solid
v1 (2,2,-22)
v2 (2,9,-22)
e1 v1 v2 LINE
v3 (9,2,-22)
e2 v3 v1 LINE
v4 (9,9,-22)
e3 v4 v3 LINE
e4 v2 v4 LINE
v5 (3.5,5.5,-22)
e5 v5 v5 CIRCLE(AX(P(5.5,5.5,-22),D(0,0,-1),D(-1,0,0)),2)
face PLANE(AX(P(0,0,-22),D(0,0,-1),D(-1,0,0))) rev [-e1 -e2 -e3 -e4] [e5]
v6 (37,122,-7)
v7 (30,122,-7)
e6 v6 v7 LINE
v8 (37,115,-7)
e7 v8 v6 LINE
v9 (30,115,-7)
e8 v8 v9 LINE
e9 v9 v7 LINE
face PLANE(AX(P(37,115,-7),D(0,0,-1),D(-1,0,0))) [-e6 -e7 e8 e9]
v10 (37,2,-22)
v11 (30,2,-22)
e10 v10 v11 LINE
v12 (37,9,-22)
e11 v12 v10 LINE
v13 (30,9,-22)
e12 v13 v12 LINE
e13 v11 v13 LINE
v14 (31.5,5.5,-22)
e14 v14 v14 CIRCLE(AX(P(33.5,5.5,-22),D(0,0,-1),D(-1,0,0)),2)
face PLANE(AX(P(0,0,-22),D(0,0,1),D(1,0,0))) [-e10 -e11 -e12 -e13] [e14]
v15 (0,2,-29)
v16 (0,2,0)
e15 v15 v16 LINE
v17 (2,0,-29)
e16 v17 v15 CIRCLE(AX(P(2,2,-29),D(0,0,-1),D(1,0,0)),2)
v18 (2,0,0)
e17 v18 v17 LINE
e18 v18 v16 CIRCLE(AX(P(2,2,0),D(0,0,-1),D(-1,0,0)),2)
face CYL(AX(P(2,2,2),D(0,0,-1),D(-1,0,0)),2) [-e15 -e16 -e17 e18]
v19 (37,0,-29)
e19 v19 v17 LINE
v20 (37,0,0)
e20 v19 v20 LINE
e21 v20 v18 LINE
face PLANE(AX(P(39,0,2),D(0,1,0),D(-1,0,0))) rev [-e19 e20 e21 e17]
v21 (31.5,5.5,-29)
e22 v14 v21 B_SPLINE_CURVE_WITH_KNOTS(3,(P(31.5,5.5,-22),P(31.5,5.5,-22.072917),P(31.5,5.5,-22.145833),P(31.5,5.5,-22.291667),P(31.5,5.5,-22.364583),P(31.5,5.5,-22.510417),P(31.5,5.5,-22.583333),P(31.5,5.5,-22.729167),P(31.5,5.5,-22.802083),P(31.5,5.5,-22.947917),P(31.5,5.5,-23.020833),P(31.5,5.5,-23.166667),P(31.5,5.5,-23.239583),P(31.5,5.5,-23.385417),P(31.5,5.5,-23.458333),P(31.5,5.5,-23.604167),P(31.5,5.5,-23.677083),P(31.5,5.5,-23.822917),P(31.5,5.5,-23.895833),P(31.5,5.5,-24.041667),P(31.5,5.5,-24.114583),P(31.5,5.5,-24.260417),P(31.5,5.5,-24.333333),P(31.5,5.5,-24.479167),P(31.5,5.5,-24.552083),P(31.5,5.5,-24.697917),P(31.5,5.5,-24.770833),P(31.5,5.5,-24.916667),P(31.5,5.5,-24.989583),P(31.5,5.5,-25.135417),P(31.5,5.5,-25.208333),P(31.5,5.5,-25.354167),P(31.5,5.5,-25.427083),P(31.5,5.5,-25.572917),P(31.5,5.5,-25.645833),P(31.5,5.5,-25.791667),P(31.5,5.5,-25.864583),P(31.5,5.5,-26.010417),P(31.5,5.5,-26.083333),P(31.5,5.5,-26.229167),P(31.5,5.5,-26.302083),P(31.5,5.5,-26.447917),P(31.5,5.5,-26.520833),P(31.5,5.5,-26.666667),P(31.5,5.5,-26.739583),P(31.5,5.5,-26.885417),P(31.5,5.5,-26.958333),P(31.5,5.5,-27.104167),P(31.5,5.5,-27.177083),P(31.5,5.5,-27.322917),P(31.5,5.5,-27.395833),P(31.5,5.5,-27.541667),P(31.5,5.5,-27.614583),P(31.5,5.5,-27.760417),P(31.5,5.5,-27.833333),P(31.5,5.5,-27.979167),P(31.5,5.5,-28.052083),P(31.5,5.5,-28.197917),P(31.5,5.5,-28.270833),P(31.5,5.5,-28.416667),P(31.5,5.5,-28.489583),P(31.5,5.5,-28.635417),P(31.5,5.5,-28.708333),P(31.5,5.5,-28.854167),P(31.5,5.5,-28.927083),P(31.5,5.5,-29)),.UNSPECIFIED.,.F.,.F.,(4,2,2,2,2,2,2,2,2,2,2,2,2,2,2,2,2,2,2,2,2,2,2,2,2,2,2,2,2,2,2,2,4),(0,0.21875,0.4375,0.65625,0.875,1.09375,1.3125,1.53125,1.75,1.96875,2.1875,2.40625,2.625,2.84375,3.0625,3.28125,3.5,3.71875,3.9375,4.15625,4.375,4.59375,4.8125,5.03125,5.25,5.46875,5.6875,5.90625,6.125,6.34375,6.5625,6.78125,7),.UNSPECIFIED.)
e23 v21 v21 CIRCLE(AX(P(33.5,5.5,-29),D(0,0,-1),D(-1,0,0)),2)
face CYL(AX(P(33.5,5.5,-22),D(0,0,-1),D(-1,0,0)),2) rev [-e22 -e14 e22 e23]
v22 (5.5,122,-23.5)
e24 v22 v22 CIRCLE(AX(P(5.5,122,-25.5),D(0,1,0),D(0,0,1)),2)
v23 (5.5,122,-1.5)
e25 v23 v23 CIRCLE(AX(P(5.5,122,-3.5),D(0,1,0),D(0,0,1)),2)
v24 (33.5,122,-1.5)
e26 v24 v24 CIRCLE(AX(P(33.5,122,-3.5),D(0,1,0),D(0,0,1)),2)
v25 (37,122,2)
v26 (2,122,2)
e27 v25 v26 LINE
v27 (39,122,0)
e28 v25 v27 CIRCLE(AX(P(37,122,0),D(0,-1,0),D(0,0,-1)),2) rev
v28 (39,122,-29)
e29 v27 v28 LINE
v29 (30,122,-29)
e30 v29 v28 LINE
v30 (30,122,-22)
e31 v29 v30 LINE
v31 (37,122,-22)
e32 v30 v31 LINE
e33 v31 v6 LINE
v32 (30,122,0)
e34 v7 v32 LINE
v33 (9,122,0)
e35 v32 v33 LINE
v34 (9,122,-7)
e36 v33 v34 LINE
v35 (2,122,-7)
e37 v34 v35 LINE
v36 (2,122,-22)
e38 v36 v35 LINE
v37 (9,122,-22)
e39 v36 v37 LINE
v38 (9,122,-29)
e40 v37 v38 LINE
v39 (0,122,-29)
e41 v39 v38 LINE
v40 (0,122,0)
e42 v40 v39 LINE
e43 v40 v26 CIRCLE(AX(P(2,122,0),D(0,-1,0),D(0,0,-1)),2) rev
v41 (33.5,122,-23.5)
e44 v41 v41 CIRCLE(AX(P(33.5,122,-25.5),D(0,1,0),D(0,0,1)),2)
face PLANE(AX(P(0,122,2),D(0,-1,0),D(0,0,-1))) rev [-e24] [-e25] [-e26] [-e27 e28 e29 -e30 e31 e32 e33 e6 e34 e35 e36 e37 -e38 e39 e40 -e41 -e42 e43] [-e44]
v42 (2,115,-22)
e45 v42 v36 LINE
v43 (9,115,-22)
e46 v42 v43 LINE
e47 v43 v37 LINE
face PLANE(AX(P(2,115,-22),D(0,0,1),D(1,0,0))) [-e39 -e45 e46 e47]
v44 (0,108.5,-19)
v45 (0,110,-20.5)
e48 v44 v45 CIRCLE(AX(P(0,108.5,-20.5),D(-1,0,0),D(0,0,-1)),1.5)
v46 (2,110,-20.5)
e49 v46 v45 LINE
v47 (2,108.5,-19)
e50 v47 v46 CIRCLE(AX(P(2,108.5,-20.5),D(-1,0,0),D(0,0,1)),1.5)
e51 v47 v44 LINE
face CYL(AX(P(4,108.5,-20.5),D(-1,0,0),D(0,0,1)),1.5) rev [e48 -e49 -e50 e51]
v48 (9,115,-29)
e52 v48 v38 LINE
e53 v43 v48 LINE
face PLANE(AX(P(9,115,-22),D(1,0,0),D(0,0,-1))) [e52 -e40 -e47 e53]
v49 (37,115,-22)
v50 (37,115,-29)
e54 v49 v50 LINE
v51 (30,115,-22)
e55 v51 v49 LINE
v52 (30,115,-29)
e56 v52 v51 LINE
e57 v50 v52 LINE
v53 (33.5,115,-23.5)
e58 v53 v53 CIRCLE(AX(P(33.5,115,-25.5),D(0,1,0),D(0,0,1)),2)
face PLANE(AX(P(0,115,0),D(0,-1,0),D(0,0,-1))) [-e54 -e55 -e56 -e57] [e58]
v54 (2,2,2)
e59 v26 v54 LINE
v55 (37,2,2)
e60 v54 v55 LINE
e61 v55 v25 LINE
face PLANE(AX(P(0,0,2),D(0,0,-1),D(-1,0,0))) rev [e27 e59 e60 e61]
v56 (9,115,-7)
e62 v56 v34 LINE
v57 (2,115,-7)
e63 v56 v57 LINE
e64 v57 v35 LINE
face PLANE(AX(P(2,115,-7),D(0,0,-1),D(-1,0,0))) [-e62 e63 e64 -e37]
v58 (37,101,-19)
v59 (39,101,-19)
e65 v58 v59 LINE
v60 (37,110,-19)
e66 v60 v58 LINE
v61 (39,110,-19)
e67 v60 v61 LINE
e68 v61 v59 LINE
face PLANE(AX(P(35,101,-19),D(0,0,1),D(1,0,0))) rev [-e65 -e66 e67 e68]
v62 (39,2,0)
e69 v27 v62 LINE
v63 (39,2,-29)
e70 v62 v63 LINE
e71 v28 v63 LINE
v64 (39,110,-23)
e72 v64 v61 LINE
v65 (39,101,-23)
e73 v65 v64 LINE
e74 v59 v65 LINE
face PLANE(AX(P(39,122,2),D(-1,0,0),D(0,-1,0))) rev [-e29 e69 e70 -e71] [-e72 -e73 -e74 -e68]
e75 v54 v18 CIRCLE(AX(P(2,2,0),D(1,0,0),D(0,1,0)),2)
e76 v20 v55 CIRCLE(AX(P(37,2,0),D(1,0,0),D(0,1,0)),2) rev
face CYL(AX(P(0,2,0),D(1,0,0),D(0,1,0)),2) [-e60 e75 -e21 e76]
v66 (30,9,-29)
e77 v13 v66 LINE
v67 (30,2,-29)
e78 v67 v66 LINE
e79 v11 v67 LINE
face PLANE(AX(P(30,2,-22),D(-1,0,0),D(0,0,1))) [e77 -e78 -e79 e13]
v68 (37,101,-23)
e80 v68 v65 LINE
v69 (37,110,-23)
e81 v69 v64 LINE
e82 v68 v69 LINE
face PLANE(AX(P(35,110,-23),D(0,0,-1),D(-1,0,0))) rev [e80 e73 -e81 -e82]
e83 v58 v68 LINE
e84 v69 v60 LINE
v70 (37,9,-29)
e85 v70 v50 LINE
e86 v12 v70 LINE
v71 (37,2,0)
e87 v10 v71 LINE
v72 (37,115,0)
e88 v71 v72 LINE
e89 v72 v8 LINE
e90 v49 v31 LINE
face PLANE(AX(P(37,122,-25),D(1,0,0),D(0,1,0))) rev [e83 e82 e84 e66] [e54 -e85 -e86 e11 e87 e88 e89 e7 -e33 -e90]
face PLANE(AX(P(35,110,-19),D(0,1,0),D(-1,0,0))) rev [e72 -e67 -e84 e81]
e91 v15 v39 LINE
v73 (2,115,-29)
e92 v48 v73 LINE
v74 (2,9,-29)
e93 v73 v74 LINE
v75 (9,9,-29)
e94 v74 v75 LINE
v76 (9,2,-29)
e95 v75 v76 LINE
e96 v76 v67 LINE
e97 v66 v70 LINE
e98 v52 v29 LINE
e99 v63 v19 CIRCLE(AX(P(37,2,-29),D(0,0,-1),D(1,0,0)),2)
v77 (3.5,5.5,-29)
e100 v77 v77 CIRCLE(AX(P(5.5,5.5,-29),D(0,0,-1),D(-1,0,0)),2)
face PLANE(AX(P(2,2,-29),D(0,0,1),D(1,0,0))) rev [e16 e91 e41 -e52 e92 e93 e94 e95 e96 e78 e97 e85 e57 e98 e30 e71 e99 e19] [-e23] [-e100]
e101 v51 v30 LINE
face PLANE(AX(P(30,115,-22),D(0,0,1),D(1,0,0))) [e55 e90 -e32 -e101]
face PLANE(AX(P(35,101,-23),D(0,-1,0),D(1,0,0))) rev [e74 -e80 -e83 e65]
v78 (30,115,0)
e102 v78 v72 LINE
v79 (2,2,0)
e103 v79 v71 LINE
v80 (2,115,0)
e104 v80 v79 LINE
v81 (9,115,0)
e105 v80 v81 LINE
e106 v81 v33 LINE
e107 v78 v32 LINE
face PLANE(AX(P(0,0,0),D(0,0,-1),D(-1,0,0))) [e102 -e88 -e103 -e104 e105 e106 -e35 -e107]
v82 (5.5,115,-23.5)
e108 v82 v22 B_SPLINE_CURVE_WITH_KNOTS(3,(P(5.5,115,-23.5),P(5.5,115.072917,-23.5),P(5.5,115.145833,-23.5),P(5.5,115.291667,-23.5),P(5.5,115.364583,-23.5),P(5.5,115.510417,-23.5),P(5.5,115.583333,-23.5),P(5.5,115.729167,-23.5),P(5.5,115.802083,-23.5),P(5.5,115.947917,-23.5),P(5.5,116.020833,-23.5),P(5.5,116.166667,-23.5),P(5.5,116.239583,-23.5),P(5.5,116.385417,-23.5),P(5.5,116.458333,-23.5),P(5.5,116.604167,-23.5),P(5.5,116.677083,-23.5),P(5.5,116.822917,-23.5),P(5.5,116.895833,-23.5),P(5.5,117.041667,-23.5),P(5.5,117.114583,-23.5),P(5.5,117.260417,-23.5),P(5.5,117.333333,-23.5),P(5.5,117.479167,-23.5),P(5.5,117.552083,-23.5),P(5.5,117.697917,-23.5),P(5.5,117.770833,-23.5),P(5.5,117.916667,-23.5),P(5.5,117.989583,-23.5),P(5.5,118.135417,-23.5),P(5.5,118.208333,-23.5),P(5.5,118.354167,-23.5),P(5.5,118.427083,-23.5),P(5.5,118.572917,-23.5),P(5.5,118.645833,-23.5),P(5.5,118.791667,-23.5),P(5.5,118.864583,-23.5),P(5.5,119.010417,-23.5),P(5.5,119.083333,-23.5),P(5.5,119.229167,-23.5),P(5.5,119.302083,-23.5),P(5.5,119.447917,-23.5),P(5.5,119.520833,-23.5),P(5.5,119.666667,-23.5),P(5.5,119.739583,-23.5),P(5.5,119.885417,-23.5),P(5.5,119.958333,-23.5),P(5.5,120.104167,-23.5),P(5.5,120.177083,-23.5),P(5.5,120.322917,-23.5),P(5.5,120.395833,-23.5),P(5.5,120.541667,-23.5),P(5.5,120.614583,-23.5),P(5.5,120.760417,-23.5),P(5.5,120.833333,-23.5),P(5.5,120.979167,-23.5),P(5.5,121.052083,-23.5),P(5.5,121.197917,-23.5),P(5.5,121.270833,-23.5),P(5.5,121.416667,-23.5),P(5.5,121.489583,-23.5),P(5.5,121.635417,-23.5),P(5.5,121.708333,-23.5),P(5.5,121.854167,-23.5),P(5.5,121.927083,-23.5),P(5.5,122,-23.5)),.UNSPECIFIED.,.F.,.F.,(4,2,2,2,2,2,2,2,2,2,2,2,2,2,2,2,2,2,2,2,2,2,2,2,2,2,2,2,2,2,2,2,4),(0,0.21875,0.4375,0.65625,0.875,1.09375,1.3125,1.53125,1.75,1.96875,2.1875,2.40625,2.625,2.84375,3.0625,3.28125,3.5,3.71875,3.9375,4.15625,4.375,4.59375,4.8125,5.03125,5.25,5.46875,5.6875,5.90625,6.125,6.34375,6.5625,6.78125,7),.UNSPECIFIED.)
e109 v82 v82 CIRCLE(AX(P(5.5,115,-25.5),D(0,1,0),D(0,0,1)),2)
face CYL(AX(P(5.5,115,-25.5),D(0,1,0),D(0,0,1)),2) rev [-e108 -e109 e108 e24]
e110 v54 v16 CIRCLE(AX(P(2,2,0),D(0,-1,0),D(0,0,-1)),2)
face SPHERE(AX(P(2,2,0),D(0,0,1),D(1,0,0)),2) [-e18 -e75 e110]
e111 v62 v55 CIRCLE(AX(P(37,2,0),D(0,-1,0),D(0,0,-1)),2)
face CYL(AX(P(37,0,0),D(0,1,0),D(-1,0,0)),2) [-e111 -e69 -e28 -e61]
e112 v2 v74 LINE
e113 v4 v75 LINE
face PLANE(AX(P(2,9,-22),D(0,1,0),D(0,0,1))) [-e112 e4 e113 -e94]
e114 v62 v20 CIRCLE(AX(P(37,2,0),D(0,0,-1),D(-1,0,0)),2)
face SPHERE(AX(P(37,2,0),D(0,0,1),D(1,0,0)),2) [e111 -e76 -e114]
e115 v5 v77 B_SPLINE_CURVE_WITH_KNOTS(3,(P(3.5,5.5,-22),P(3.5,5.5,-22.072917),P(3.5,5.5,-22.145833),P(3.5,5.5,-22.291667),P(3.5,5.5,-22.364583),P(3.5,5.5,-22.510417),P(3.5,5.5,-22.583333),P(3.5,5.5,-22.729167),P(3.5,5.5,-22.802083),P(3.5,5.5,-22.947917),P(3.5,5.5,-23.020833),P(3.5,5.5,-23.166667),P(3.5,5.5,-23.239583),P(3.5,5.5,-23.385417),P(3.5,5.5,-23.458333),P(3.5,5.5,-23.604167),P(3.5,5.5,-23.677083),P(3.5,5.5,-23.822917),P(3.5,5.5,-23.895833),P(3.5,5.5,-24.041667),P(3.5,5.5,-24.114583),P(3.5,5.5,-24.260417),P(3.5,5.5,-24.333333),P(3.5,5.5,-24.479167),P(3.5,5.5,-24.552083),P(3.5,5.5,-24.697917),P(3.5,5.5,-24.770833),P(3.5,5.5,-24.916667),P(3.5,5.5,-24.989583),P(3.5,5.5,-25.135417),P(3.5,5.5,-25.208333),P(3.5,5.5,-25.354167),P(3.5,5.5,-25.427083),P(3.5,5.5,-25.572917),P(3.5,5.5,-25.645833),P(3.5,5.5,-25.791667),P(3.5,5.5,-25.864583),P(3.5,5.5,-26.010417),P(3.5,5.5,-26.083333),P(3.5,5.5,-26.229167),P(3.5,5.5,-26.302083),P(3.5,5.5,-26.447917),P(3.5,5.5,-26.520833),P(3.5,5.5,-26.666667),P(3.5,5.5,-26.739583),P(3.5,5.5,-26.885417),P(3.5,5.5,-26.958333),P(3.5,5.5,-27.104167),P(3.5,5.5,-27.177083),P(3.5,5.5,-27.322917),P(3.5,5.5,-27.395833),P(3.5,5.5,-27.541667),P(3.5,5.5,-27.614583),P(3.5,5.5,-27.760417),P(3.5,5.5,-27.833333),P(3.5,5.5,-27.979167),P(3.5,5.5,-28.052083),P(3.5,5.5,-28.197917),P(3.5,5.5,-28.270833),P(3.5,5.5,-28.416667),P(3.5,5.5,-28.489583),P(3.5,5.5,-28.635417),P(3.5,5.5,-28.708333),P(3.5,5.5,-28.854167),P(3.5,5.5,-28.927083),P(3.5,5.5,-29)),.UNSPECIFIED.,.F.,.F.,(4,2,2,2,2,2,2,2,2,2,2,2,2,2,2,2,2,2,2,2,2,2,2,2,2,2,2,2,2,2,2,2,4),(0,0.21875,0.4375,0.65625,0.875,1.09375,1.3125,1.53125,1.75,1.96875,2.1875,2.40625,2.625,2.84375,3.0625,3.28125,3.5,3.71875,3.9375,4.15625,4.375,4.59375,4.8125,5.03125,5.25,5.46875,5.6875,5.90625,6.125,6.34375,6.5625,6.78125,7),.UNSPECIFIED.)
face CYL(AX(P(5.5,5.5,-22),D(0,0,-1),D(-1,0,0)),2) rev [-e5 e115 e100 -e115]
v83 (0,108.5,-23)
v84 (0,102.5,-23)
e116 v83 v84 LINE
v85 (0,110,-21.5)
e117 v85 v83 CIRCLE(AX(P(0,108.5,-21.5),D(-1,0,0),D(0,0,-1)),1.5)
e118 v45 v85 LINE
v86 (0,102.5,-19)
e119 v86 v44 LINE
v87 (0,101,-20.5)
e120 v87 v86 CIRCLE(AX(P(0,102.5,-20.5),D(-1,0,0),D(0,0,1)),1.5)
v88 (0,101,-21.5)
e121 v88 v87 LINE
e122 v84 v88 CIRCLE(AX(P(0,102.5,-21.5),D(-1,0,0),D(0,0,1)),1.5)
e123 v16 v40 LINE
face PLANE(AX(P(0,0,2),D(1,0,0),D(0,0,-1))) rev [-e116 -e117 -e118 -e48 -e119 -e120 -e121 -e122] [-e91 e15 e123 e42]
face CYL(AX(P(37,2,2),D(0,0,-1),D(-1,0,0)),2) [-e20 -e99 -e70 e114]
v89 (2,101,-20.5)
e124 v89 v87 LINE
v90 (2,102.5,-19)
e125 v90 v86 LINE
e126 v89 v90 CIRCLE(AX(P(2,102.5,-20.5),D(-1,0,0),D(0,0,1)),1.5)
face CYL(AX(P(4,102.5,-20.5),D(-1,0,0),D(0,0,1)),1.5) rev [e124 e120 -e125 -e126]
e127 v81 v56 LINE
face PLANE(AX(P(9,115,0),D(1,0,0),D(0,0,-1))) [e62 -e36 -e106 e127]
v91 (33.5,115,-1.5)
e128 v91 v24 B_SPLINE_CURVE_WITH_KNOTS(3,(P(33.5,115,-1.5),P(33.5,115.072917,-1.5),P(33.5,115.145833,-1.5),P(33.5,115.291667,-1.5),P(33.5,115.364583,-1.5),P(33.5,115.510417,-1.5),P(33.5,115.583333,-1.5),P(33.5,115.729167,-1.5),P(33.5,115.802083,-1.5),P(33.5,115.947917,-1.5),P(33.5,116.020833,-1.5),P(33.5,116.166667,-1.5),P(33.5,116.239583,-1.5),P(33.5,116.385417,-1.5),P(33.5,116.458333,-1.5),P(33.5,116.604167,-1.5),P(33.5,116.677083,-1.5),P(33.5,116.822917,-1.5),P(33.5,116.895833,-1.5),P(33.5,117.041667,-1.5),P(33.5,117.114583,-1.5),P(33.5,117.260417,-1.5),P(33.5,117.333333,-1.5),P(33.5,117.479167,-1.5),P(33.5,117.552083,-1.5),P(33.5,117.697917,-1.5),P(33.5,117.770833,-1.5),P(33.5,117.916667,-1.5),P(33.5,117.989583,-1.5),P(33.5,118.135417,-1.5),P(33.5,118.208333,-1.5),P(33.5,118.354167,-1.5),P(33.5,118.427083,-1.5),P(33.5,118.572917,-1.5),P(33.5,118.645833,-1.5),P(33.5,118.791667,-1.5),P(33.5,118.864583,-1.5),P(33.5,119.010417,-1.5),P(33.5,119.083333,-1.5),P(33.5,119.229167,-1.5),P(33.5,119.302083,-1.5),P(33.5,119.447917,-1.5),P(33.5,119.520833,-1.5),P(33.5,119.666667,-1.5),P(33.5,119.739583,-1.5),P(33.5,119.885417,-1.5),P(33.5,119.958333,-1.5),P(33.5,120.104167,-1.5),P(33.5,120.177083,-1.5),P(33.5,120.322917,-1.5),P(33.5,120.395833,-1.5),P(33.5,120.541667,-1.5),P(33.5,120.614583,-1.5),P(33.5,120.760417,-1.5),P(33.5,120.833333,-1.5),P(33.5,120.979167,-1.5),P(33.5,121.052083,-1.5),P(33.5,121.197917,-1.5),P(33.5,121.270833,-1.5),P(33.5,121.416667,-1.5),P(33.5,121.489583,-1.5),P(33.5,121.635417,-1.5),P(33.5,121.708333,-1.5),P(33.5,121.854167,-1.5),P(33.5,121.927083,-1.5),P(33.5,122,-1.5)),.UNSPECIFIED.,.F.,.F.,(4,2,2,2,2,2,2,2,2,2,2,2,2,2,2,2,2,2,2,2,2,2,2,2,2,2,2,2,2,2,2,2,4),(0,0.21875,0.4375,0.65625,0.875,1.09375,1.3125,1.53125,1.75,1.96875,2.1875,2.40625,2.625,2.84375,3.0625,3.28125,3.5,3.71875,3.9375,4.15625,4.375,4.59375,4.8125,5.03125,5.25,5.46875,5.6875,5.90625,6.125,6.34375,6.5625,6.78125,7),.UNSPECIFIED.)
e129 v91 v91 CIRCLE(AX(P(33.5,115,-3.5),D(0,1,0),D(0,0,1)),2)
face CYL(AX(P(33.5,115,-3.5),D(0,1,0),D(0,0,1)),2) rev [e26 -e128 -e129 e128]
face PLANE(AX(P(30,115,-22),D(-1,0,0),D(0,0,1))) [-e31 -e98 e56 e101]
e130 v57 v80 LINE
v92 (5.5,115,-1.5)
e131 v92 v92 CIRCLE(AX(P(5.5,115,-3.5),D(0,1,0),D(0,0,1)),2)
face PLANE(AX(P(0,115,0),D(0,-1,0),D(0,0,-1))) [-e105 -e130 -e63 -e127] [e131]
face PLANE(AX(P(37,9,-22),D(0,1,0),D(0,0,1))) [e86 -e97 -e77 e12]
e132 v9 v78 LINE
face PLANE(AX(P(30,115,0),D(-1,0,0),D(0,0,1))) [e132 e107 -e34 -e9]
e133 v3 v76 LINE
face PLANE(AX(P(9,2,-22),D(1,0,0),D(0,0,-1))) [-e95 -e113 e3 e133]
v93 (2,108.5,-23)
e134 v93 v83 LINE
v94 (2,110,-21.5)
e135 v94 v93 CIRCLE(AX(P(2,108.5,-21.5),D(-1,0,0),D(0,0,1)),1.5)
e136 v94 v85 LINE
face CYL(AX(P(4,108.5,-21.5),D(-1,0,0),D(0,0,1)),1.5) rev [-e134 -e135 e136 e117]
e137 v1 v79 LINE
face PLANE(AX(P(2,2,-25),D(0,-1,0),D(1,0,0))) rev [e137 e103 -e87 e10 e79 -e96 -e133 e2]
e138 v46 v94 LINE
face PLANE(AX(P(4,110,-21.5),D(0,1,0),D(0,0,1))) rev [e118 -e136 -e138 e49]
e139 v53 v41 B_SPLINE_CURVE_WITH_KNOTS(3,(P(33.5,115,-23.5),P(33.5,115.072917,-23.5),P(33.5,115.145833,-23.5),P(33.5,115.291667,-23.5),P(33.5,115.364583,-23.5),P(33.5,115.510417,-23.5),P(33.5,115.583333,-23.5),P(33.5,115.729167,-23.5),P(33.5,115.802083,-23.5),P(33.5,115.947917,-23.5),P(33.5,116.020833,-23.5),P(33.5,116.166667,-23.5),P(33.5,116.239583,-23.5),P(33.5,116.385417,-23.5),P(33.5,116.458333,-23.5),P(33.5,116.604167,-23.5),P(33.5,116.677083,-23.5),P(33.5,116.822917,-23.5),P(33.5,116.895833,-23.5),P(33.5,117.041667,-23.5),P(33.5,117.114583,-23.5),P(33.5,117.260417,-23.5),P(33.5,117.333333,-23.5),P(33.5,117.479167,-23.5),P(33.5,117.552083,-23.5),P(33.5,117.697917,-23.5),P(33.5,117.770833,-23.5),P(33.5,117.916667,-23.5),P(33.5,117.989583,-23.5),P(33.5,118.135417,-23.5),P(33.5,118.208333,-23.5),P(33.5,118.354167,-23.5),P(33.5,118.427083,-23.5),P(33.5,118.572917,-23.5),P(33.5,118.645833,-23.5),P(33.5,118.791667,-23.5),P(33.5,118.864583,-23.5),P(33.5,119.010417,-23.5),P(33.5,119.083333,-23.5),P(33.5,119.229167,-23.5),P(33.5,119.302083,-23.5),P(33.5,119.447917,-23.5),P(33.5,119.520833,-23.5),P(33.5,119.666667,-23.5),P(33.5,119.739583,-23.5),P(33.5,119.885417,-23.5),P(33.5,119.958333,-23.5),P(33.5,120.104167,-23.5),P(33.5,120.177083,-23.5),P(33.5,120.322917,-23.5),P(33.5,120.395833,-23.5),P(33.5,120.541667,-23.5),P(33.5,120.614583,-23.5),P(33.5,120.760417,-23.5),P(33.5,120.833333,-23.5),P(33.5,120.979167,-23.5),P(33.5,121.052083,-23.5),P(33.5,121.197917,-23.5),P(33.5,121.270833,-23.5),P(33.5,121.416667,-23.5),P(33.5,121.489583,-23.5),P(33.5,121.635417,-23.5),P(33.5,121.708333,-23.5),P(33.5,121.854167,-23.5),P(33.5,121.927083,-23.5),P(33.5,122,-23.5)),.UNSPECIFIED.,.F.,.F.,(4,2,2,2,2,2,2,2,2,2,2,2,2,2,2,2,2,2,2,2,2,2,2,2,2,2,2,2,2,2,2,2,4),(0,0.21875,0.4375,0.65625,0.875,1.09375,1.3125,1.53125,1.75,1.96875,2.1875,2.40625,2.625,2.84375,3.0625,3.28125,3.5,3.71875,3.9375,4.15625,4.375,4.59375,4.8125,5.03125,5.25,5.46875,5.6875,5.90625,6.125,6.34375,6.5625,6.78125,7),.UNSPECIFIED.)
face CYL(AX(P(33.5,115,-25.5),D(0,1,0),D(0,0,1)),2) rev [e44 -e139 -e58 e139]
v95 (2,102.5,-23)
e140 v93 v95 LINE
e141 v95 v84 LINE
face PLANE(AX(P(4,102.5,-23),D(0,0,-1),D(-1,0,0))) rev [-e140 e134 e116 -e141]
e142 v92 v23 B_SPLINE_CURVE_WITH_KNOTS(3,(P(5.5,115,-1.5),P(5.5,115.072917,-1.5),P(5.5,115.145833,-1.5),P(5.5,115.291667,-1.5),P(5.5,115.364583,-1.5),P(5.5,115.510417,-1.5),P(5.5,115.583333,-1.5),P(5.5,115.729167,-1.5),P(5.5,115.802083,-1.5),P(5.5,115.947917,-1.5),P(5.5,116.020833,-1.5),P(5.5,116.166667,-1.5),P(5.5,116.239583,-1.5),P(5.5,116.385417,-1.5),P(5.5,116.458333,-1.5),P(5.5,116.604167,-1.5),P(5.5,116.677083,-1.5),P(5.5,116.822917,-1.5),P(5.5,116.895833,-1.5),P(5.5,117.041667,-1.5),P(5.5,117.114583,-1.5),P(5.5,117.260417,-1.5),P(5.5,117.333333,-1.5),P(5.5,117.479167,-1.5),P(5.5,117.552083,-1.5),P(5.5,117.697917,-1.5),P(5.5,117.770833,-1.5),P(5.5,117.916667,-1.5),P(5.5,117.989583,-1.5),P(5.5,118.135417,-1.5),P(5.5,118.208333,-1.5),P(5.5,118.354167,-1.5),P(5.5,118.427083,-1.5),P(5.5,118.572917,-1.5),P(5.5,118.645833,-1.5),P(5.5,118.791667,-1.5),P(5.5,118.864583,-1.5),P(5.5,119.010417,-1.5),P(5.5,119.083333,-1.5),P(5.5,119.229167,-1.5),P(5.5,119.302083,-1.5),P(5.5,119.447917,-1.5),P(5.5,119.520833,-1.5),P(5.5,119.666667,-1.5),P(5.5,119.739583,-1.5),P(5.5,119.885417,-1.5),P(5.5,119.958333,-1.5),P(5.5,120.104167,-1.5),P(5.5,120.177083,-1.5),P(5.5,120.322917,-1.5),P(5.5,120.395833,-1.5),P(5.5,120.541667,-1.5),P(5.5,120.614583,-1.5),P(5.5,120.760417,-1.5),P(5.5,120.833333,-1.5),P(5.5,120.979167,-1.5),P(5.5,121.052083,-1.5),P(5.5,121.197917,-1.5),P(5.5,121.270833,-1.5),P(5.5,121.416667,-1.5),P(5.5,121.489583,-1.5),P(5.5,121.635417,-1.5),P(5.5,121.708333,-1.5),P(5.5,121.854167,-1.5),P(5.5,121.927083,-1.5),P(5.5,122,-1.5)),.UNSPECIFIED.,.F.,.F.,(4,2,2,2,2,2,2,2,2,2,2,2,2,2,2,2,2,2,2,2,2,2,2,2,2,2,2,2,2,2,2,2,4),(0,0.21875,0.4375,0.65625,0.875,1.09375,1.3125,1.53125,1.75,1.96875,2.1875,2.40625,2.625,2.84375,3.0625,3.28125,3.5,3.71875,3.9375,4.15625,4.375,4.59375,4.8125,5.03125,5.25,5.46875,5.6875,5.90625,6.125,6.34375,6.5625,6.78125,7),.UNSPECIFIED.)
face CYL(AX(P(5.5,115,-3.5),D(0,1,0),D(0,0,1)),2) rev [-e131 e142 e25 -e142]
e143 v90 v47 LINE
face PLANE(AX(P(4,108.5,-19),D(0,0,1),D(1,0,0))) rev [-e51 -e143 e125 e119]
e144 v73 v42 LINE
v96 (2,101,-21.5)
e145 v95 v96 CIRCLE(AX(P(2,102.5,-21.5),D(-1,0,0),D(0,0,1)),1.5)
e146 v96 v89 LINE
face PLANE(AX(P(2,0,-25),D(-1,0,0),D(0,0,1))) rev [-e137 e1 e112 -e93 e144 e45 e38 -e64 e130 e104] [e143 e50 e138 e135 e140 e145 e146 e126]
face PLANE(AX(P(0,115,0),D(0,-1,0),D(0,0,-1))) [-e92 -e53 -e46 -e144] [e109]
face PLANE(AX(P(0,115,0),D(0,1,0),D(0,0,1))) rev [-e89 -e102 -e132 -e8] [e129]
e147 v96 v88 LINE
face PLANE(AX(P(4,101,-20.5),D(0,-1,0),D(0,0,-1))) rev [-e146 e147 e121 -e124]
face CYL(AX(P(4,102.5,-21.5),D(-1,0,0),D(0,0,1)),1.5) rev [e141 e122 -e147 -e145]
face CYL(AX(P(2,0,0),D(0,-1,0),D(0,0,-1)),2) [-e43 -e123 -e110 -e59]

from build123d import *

# Parameters (mm, degrees)
SKETCH1_W            = 39
SKETCH1_H            = 122
BOSS_EXTRUDE2_DEPTH  = 2
SKETCH2_W            = 2
SKETCH2_H            = 122
BOSS_EXTRUDE3_DEPTH  = 25
SKETCH3_W            = 2
SKETCH3_H            = 122
BOSS_EXTRUDE4_DEPTH  = 25
SKETCH4_W            = 35
SKETCH4_H            = 2
BOSS_EXTRUDE5_DEPTH  = 25
FILLET2_R            = 2
BOSS_EXTRUDE7_DEPTH  = 4
CUT_EXTRUDE2_DEPTH   = 4
SKETCH5_W            = 4
SKETCH5_H            = 9
CUT_EXTRUDE3_DEPTH   = 4
FILLET4_R            = 2
SKETCH8_W            = 7
SKETCH8_H            = 7
BOSS_EXTRUDE8_DEPTH  = 7
SKETCH9_W            = 7
SKETCH9_H            = 7
BOSS_EXTRUDE10_DEPTH = 7
SKETCH10_R           = 2
CUT_EXTRUDE6_DEPTH   = 7
SKETCH11_W           = 7
SKETCH11_H           = 7
BOSS_EXTRUDE11_DEPTH = 7
SKETCH12_R           = 2
CUT_EXTRUDE7_DEPTH   = 7


with BuildPart() as part:
    # Sketch1 → Boss-Extrude2 (new body)
    with BuildSketch(Plane.XY):
        with Locations((19.5, 61)):
            Rectangle(SKETCH1_W, SKETCH1_H)
    extrude(amount=BOSS_EXTRUDE2_DEPTH)

    # Sketch2 → Boss-Extrude3 (add)
    with BuildSketch(Plane(origin=(0, 0, 0), x_dir=(-1, 0, 0), z_dir=(0, 0, -1))):
        with Locations((-38, 61)):
            Rectangle(SKETCH2_W, SKETCH2_H)
    extrude(amount=BOSS_EXTRUDE3_DEPTH)

    # Sketch3 → Boss-Extrude4 (add)
    with BuildSketch(Plane(origin=(0, 0, 0), x_dir=(-1, 0, 0), z_dir=(0, 0, -1))):
        with Locations((-1, 61)):
            Rectangle(SKETCH3_W, SKETCH3_H)
    extrude(amount=BOSS_EXTRUDE4_DEPTH)

    # Sketch4 → Boss-Extrude5 (add)
    with BuildSketch(Plane(origin=(0, 0, 0), x_dir=(-1, 0, 0), z_dir=(0, 0, -1))):
        with Locations((-19.5, 1)):
            Rectangle(SKETCH4_W, SKETCH4_H)
    extrude(amount=BOSS_EXTRUDE5_DEPTH)

    # Fillet2
    fillet2_edges = [part.edges().sort_by_distance(p)[0] for p in [
        (19.5, 0, 2),
        (0, 0, -11.5),
        (39, 0, -11.5),
    ]]
    fillet(fillet2_edges, radius=FILLET2_R)

    # Sketch6 → Boss-Extrude7 (add)
    with BuildSketch(Plane(origin=(0, 0, -25), x_dir=(-1, 0, 0), z_dir=(0, 0, -1))):
        with BuildLine():
            Line((-2, 122), (0, 122))
            Line((0, 122), (0, 2))
            ThreePointArc((0, 2), (-0.585786438, 0.585786438), (-2, 0))
            Line((-2, 0), (-37, 0))
            ThreePointArc((-37, 0), (-38.414213562, 0.585786438), (-39, 2))
            Line((-39, 2), (-39, 122))
            Line((-39, 122), (-37, 122))
            Line((-37, 122), (-37, 2))
            Line((-37, 2), (-2, 2))
            Line((-2, 2), (-2, 122))
        make_face()
    extrude(amount=BOSS_EXTRUDE7_DEPTH)

    # Sketch7 → Cut-Extrude2 (cut)
    with BuildSketch(Plane.ZY):
        with BuildLine():
            Line((-21.5, 110), (-20.5, 110))
            ThreePointArc((-20.5, 110), (-19.439339828, 109.560660172), (-19, 108.5))
            Line((-19, 108.5), (-19, 102.5))
            ThreePointArc((-19, 102.5), (-19.439339828, 101.439339828), (-20.5, 101))
            Line((-20.5, 101), (-21.5, 101))
            ThreePointArc((-21.5, 101), (-22.560660172, 101.439339828), (-23, 102.5))
            Line((-23, 102.5), (-23, 108.5))
            ThreePointArc((-23, 108.5), (-22.560660172, 109.560660172), (-21.5, 110))
        make_face()
    extrude(amount=-CUT_EXTRUDE2_DEPTH, mode=Mode.SUBTRACT)

    # Sketch5 → Cut-Extrude3 (cut)
    with BuildSketch(Plane(origin=(39, 0, 0), x_dir=(0, 0, -1), z_dir=(1, 0, 0))):
        with Locations((21, 105.5)):
            Rectangle(SKETCH5_W, SKETCH5_H)
    extrude(amount=-CUT_EXTRUDE3_DEPTH, mode=Mode.SUBTRACT)

    # Fillet4
    # the kernel refuses this fillet: 2 mm, written as the material it takes off along each edge
    with BuildSketch(Plane(origin=(37, 2, 0), x_dir=(1, 0, 0), z_dir=(0, 0, 1))) as fillet4_piece_1_section:
        Polygon((0, 0), (FILLET4_R, 0), (FILLET4_R, -FILLET4_R), (0, -FILLET4_R), align=None)
    fillet4_piece_1 = extrude(amount=FILLET4_R, mode=Mode.PRIVATE)
    fillet4_piece_1 = fillet4_piece_1 - Plane(origin=(37, 2, 0), x_dir=(-0.7071067811865476, 0.7071067811865475, 0), z_dir=(0, 0, 1)) * Sphere(FILLET4_R, mode=Mode.PRIVATE)
    add(fillet4_piece_1, mode=Mode.SUBTRACT)
    with BuildSketch(Plane(origin=(2, 2, 0), x_dir=(0, 0, 1), z_dir=(-1, 0, 0))) as fillet4_piece_2_section:
        Polygon((0, 0), (FILLET4_R, 0), (FILLET4_R, -FILLET4_R), (0, -FILLET4_R), align=None)
    fillet4_piece_2 = extrude(amount=FILLET4_R, mode=Mode.PRIVATE)
    fillet4_piece_2 = fillet4_piece_2 - Plane(origin=(2, 2, 0), x_dir=(0, 0.7071067811865475, -0.7071067811865475), z_dir=(-1, 0, 0)) * Sphere(FILLET4_R, mode=Mode.PRIVATE)
    add(fillet4_piece_2, mode=Mode.SUBTRACT)
    with BuildSketch(Plane(origin=(0, 2, 2), x_dir=(0, 0, -1), z_dir=(0, 1, 0))) as fillet4_piece_3:
        with BuildLine():
            CenterArc((FILLET4_R, -FILLET4_R), FILLET4_R, 90, 90)
            Line((0, -FILLET4_R), (0, 0))
            Line((0, 0), (FILLET4_R, 0))
        make_face()
    extrude(amount=125, mode=Mode.SUBTRACT)
    with BuildSketch(Plane(origin=(39, 127, 2), x_dir=(-1, 0, 0), z_dir=(0, -1, 0))) as fillet4_piece_4:
        with BuildLine():
            CenterArc((FILLET4_R, FILLET4_R), FILLET4_R, 180, 90)
            Line((0, FILLET4_R), (0, 0))
            Line((0, 0), (FILLET4_R, 0))
        make_face()
    extrude(amount=125, mode=Mode.SUBTRACT)

    # Sketch8 → Boss-Extrude8 (add)
    with BuildSketch(Plane(origin=(0, 0, -29), x_dir=(-1, 0, 0), z_dir=(0, 0, -1))):
        with Locations((-33.5, 5.5)):
            Rectangle(SKETCH8_W, SKETCH8_H)
    extrude(amount=-BOSS_EXTRUDE8_DEPTH)

    # Sketch9 → Boss-Extrude10 (add)
    with BuildSketch(Plane(origin=(0, 0, -29), x_dir=(-1, 0, 0), z_dir=(0, 0, -1))):
        with Locations((-5.5, 5.5)):
            Rectangle(SKETCH9_W, SKETCH9_H)
    extrude(amount=-BOSS_EXTRUDE10_DEPTH)

    # Sketch10 → Cut-Extrude6 (cut)
    with BuildSketch(Plane(origin=(0, 0, -29), x_dir=(-1, 0, 0), z_dir=(0, 0, -1))):
        with Locations((-33.5, 5.5)):
            Circle(SKETCH10_R)
        with Locations((-5.5, 5.5)):
            Circle(SKETCH10_R)
    extrude(amount=-CUT_EXTRUDE6_DEPTH, mode=Mode.SUBTRACT)

    # Sketch11 → Boss-Extrude11 (add)
    with BuildSketch(Plane(origin=(0, 122, 0), x_dir=(1, 0, 0), z_dir=(0, 1, 0))):
        with Locations((5.5, 3.5)):
            Rectangle(SKETCH11_W, SKETCH11_H)
        with Locations((33.5, 3.5)):
            Rectangle(SKETCH11_W, SKETCH11_H)
        with Locations((5.5, 25.5)):
            Rectangle(SKETCH11_W, SKETCH11_H)
        with Locations((33.5, 25.5)):
            Rectangle(SKETCH11_W, SKETCH11_H)
    extrude(amount=-BOSS_EXTRUDE11_DEPTH)

    # Sketch12 → Cut-Extrude7 (cut)
    with BuildSketch(Plane(origin=(0, 122, 0), x_dir=(1, 0, 0), z_dir=(0, 1, 0))):
        with Locations(Location((5.5, 25.5, 0), (0, 0, 270))):
            Circle(SKETCH12_R)
        with Locations(Location((33.5, 25.5, 0), (0, 0, 270))):
            Circle(SKETCH12_R)
        with Locations(Location((5.5, 3.5, 0), (0, 0, 270))):
            Circle(SKETCH12_R)
        with Locations(Location((33.5, 3.5, 0), (0, 0, 270))):
            Circle(SKETCH12_R)
    extrude(amount=-CUT_EXTRUDE7_DEPTH, mode=Mode.SUBTRACT)


solid = part.part
